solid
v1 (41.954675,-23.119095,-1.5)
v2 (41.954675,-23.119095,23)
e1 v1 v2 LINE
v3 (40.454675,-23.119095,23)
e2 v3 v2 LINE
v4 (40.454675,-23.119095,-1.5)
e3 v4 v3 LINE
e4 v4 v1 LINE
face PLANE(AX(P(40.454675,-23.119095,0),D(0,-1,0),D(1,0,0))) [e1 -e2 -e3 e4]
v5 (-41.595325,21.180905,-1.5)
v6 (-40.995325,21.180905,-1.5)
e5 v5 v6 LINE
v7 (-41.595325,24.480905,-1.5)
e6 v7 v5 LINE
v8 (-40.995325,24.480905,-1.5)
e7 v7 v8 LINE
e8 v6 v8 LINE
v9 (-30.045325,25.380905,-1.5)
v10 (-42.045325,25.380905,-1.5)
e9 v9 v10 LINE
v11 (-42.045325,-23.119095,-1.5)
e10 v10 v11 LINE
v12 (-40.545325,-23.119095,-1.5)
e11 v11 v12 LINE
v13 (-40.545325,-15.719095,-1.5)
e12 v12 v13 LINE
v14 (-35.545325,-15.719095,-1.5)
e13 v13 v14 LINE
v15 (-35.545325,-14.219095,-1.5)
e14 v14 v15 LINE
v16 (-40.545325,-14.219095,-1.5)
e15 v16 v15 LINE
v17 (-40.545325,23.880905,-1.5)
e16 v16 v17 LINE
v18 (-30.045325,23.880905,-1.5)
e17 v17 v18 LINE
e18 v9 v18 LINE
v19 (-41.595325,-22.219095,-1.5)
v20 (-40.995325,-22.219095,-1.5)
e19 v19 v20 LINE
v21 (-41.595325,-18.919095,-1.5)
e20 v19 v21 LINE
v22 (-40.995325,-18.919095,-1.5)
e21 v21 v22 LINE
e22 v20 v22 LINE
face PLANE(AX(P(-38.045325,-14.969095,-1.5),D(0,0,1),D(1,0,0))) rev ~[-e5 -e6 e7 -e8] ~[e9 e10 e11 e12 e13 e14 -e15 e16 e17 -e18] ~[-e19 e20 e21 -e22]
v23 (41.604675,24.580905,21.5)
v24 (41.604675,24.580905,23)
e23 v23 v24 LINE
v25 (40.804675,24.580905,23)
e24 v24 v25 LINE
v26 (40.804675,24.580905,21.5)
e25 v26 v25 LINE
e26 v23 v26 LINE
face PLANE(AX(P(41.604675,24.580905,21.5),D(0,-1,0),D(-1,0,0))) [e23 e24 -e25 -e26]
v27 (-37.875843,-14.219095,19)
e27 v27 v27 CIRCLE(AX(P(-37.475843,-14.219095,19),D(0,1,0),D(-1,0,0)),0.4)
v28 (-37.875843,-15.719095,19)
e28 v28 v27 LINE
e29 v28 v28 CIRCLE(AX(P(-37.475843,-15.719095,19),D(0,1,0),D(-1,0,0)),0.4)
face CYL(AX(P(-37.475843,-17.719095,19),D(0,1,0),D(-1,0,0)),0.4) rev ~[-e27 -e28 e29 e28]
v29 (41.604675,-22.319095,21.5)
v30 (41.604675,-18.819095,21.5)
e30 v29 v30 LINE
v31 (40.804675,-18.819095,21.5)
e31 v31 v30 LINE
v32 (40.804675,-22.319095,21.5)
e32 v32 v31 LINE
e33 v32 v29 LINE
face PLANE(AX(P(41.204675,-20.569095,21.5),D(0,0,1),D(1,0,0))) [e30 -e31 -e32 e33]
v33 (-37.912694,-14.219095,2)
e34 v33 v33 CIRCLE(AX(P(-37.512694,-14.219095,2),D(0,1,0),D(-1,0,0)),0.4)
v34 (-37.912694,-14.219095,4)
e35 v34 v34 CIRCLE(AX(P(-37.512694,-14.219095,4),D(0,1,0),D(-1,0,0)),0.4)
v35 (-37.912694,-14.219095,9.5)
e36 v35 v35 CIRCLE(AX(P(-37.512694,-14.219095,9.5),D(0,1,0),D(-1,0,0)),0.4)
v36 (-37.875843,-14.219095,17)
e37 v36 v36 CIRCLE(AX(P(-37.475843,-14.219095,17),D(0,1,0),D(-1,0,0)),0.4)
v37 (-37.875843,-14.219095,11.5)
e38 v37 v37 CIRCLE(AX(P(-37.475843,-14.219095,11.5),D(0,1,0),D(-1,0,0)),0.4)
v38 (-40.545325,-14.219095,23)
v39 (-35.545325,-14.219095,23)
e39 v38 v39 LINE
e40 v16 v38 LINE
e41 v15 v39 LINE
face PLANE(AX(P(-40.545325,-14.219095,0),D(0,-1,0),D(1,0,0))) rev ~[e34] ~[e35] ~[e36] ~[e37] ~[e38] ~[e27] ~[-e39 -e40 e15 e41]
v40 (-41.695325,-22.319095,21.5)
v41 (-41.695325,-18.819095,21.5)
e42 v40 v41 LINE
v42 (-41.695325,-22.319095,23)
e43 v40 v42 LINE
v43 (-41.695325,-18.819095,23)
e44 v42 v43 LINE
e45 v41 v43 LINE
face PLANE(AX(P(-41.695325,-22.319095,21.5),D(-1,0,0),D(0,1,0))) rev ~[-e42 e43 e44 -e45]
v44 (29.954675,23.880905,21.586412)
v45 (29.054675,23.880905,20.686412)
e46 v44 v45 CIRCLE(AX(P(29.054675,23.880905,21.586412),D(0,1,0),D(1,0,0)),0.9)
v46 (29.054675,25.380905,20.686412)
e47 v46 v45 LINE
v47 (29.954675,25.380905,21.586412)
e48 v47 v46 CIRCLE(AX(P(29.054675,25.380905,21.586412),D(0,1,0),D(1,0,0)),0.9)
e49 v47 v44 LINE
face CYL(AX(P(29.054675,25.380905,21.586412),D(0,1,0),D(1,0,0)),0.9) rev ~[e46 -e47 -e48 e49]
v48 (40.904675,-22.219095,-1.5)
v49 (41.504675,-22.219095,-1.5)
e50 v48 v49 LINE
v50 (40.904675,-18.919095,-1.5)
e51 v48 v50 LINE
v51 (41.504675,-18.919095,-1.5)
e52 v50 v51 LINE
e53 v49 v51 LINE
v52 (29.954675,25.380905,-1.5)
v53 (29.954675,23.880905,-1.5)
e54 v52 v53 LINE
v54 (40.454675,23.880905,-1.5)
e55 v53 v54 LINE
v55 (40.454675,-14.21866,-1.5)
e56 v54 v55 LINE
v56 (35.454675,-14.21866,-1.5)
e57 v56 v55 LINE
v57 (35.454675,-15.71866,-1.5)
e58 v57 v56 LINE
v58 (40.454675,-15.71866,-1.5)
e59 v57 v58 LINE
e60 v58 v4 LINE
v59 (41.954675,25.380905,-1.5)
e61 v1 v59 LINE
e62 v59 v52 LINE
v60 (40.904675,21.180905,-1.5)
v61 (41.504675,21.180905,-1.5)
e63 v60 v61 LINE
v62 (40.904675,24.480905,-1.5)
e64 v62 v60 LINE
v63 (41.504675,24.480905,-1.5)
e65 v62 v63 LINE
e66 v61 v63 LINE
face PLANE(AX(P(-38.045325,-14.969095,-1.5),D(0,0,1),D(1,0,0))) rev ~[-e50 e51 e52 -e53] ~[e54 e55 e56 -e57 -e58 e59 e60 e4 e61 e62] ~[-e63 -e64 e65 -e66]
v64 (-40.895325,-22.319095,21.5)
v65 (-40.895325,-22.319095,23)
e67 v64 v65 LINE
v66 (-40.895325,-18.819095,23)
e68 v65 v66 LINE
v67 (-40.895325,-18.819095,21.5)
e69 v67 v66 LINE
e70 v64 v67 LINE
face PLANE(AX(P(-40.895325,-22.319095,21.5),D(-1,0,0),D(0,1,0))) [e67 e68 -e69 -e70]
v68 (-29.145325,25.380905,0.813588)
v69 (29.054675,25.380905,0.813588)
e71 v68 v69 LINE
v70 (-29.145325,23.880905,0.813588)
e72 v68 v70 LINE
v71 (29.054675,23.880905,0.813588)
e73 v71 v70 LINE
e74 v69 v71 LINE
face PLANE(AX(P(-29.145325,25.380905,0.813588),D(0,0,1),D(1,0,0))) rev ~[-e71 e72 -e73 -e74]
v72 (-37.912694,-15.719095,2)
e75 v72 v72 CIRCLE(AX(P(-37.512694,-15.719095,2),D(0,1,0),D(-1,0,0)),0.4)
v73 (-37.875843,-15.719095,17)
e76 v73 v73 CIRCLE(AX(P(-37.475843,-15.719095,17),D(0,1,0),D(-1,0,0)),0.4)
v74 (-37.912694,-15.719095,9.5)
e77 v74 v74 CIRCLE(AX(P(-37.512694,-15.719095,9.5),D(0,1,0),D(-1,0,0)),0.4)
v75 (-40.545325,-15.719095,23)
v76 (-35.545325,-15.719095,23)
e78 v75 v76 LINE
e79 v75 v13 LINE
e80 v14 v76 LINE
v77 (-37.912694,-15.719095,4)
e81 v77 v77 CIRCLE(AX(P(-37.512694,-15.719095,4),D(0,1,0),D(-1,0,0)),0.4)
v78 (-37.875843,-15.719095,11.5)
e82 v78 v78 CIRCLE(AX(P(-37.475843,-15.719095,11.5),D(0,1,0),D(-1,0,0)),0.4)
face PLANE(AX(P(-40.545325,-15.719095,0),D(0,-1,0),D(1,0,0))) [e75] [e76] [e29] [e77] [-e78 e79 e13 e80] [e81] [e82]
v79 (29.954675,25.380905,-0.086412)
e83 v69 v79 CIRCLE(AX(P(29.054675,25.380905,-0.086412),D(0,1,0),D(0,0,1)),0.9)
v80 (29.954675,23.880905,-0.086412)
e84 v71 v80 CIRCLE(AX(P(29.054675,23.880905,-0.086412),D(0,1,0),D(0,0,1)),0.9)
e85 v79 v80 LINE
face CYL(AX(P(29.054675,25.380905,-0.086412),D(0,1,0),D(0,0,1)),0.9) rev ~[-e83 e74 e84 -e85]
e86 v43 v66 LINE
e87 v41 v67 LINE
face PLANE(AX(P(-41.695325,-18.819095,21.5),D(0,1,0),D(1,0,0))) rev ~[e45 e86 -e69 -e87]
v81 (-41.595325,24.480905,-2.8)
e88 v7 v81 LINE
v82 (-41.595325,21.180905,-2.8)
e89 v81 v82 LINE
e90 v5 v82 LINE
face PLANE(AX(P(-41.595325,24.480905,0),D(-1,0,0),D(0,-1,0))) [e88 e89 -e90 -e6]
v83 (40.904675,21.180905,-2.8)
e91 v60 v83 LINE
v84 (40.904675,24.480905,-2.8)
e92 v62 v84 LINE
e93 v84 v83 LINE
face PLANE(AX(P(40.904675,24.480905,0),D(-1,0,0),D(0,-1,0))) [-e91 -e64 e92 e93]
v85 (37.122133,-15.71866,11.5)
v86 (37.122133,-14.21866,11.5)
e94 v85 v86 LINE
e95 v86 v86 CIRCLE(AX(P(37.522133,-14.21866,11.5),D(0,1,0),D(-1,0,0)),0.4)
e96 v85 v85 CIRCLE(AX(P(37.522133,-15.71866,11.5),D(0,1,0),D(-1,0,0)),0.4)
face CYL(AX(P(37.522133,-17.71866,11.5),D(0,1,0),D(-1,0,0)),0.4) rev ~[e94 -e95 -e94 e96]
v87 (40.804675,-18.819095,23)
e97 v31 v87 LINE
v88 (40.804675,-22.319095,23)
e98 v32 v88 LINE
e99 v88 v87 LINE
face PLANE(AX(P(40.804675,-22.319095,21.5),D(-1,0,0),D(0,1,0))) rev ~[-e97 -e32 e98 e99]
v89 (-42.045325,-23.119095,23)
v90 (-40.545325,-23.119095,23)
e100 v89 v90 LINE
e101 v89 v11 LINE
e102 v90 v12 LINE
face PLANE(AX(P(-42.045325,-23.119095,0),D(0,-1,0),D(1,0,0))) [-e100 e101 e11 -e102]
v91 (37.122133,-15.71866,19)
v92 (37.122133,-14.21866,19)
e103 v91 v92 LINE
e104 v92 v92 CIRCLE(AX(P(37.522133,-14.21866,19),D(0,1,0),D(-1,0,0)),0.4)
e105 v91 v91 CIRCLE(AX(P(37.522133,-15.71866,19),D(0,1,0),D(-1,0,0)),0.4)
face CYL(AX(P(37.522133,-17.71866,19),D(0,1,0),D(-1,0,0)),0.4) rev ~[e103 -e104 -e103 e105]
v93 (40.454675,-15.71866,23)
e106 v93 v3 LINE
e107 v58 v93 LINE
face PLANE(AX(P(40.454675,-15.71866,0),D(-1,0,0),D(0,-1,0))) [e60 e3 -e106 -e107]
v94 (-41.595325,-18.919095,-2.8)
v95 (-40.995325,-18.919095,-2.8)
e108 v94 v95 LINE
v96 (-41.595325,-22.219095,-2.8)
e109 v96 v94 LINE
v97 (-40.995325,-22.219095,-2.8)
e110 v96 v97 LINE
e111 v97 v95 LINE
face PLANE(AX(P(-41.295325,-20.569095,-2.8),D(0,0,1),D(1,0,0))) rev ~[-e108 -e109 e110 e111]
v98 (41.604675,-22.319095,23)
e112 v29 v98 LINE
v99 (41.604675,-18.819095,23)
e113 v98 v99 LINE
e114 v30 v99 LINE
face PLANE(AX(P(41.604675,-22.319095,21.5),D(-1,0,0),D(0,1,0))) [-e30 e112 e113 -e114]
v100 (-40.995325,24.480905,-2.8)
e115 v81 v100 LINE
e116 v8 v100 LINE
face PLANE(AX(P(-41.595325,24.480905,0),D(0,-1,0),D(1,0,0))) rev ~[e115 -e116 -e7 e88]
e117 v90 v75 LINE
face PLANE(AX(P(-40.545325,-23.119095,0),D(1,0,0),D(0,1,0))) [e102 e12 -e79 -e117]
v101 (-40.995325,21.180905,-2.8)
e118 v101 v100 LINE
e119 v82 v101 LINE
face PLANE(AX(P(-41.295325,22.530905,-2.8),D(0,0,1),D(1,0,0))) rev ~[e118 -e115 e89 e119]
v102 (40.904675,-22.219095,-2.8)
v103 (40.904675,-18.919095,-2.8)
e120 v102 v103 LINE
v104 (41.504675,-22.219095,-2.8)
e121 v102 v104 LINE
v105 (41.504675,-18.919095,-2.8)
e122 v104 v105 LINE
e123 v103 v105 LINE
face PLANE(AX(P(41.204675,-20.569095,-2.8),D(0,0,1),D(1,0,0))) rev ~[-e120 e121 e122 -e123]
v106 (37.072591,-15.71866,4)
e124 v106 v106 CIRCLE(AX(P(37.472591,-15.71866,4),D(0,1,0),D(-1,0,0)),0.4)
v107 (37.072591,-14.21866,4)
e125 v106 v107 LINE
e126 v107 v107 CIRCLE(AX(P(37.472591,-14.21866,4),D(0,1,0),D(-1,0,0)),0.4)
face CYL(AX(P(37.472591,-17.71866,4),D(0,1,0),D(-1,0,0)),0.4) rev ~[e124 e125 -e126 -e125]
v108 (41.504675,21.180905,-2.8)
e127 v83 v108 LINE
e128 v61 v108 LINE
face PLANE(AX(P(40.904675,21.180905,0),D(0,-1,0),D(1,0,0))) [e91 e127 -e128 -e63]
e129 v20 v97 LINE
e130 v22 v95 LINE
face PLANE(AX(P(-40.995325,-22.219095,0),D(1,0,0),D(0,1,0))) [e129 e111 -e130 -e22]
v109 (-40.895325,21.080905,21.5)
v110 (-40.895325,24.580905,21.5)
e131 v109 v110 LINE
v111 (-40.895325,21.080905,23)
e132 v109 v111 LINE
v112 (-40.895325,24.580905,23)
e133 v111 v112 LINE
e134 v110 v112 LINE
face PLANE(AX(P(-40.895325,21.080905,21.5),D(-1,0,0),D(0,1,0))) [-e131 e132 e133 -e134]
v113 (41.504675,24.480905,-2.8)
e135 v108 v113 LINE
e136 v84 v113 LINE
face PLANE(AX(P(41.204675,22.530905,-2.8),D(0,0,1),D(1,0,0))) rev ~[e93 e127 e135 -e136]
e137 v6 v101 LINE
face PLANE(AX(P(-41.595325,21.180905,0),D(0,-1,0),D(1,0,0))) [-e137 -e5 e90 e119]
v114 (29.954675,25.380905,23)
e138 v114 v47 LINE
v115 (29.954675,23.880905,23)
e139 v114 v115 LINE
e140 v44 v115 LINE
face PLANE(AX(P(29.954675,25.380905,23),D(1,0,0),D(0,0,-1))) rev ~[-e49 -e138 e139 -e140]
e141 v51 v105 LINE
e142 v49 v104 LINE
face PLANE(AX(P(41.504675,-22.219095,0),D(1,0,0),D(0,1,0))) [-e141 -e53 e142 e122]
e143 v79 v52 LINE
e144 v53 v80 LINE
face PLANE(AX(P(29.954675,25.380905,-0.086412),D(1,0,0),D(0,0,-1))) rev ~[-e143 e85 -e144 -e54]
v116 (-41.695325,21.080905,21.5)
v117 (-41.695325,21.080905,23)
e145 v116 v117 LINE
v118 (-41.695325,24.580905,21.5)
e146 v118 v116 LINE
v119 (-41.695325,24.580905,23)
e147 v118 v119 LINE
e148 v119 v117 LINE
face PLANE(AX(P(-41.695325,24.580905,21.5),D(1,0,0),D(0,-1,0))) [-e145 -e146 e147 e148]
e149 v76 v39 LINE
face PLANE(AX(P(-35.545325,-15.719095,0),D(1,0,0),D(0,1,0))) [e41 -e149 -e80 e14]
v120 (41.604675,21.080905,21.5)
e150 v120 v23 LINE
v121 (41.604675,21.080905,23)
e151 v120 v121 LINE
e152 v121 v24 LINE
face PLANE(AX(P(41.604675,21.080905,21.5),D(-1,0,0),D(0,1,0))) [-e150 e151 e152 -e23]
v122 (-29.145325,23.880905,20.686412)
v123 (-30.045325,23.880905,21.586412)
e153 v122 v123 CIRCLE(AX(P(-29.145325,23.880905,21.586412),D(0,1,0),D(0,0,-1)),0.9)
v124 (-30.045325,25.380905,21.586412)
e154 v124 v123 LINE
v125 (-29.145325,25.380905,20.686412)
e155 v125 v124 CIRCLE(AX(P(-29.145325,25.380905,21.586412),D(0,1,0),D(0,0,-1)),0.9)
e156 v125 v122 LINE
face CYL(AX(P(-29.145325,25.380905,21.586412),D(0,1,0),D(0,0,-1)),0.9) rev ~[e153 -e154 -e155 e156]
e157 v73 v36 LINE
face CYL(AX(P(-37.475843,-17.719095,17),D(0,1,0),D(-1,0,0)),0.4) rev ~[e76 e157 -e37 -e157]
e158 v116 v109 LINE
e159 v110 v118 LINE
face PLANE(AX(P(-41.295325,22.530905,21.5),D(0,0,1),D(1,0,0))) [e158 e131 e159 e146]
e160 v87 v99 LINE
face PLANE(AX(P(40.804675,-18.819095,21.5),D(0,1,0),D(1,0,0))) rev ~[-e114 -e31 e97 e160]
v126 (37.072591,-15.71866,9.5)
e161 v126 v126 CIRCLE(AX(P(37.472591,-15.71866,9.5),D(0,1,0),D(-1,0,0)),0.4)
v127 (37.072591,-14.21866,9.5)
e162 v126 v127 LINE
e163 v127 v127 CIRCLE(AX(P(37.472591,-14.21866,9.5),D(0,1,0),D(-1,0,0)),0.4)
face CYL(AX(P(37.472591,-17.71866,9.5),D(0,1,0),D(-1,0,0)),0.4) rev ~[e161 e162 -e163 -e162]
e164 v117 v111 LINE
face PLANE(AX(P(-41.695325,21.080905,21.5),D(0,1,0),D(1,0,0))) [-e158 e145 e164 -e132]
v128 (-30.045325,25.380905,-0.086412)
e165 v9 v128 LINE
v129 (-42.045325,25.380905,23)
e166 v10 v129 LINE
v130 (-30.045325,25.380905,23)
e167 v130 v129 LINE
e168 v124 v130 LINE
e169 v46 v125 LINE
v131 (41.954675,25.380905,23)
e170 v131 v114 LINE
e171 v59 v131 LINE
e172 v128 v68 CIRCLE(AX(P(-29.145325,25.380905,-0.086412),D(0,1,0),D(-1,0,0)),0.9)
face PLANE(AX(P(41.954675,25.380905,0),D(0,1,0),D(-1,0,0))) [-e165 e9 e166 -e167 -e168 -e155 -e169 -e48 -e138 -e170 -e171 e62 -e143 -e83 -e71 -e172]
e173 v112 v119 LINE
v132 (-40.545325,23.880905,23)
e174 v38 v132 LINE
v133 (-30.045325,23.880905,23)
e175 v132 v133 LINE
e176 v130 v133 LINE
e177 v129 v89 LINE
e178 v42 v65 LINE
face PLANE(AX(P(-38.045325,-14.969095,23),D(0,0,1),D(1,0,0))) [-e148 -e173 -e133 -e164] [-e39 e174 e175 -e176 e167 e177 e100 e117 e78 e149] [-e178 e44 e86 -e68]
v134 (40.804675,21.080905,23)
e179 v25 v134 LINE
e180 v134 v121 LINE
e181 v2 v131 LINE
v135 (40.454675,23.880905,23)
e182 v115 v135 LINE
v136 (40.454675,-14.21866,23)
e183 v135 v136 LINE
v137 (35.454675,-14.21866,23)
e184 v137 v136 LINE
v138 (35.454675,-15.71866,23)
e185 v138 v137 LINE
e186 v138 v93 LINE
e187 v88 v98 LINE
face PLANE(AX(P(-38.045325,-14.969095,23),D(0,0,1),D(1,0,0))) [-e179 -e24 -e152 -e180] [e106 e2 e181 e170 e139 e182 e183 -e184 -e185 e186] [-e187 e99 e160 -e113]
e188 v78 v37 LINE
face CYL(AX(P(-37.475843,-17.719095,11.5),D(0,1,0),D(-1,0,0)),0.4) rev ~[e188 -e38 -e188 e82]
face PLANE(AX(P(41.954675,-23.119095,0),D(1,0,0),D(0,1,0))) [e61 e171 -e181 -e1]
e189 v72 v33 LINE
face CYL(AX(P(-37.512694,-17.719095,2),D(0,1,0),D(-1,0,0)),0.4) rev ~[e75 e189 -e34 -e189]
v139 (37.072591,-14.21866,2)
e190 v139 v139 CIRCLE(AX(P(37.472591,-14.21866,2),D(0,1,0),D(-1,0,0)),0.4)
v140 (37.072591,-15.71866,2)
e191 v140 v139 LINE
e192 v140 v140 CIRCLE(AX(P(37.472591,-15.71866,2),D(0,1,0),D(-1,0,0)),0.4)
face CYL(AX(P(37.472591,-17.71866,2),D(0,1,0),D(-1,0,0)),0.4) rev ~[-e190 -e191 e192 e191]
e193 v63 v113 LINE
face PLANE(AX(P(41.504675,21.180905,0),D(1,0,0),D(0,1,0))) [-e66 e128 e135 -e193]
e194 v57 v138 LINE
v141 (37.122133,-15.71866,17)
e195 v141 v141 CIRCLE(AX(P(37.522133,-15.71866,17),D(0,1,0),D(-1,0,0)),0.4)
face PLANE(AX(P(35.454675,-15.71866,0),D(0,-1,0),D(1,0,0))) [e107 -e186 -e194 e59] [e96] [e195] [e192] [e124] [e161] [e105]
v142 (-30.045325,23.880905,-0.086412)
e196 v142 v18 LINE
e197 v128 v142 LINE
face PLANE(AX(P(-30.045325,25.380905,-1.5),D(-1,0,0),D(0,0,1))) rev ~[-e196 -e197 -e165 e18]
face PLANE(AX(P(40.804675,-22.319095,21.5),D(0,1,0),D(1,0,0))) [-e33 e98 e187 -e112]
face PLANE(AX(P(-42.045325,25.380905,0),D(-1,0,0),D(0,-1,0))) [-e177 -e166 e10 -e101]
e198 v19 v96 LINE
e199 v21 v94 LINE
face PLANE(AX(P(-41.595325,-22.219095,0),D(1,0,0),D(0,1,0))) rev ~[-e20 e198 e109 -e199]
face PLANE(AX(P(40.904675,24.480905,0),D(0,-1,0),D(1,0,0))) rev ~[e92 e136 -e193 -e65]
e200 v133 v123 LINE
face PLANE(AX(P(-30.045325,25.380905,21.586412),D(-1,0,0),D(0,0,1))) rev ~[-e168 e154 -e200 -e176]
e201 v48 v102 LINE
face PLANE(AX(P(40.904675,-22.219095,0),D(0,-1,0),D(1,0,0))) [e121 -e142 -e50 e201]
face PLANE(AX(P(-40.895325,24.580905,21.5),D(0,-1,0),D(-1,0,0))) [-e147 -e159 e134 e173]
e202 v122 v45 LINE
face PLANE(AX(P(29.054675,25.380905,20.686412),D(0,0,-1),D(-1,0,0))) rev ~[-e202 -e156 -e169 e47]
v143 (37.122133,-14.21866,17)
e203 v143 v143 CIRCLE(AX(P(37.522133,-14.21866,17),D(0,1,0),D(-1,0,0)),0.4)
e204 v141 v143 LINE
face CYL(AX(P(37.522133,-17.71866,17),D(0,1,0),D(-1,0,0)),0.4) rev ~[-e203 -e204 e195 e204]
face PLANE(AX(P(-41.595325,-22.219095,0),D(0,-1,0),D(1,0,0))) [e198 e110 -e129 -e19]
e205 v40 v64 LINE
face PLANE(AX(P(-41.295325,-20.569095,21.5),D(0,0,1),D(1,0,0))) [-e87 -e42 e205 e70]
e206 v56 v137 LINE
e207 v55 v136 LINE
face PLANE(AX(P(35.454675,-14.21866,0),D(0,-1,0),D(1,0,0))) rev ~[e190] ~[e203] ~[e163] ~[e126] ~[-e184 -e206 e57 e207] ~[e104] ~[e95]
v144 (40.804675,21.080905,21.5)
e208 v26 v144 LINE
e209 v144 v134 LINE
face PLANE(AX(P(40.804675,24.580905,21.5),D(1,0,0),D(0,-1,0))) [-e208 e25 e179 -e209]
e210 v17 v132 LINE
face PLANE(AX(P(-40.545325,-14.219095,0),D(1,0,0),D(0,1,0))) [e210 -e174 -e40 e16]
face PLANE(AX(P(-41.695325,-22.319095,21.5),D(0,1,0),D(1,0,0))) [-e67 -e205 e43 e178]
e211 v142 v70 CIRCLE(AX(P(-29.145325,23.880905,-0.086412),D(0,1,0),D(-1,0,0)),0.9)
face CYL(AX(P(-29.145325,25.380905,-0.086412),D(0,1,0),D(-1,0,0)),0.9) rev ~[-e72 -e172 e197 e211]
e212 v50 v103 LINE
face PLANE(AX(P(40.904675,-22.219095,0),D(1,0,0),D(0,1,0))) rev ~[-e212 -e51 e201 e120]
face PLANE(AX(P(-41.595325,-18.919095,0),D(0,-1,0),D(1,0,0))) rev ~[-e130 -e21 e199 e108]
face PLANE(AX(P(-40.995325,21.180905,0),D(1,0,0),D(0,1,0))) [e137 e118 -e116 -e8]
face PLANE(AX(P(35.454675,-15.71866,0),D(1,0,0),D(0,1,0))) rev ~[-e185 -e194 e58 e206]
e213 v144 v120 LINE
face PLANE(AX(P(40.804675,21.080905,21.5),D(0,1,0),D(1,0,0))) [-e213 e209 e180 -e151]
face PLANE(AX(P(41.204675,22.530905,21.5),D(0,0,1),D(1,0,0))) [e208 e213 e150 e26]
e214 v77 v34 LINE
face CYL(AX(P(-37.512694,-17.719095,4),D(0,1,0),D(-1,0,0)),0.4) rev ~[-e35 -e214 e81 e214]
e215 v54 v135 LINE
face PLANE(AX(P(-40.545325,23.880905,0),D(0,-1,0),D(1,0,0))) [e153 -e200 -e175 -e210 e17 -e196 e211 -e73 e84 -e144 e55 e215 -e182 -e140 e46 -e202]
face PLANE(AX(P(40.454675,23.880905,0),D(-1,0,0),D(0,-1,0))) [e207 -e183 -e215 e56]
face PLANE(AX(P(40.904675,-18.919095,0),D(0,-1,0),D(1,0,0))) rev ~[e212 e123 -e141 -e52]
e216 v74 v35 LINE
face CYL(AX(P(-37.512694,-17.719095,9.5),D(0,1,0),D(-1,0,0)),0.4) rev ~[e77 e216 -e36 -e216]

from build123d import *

# Parameters (mm, degrees)
F0_W          = 5
F0_H          = 1.5
F0_W_2        = 0.8
F0_H_2        = 3.5
F0_W_3        = 0.6
F0_H_3        = 3.3
F0_H_4        = 2.7
F0_H_5        = 0.6
F1_DEPTH      = 23
F1_DEPTH_BACK = 1.5
F3_D          = 0.8
F3_DEPTH      = 2
F3_TIP        = 0.2403442476
F5_D          = 0.8
F5_DEPTH      = 2
F5_TIP        = 0.2403442476
F6_DEPTH      = 2.8
F7_START      = 21.5
F7_DEPTH      = 1.5
F9_DEPTH      = 2


# Not quite as in the source:
# - a feature names something its author has since deleted; it is built from what else it names


with BuildPart() as f1:
    # F0 (on Top) → F1 (new body, two sides)
    with BuildSketch(Plane.XY) as f1_sk:
        with Locations((-38.0453250408, -14.9690947816)):
            Rectangle(F0_W, F0_H)
        Polygon((-42.0453250408, -23.1190947816), (-40.5453250408, -23.1190947816), (-40.5453250408, -15.7190947816), (-40.5453250408, -14.2190947816), (-40.5453250408, 23.8809052184), (-40.8953250408, 23.8809052184), (-40.8953250408, 21.0809052184), (-41.6953250408, 21.0809052184), (-41.6953250408, 23.8809052184), (-42.0453250408, 23.8809052184), align=None)
        with Locations((-41.2953250408, -20.5690947816)):
            Rectangle(F0_W_2, F0_H_2, mode=Mode.SUBTRACT)
        Polygon((-42.0453250408, 25.3809052184), (-42.0453250408, 23.8809052184), (-41.6953250408, 23.8809052184), (-41.6953250408, 24.5809052184), (-40.8953250408, 24.5809052184), (-40.8953250408, 23.8809052184), (-40.5453250408, 23.8809052184), (40.4546749592, 23.8809052184), (40.8046749592, 23.8809052184), (40.8046749592, 24.5809052184), (41.6046749592, 24.5809052184), (41.6046749592, 23.8809052184), (41.9546749592, 23.8809052184), (41.9546749592, 25.3809052184), align=None)
        Polygon((40.8046749592, 23.8809052184), (40.4546749592, 23.8809052184), (40.4546749592, -14.2186603174), (40.4546749592, -15.7186603174), (40.4546749592, -23.1190947816), (41.9546749592, -23.1190947816), (41.9546749592, 23.8809052184), (41.6046749592, 23.8809052184), (41.6046749592, 21.0809052184), (40.8046749592, 21.0809052184), align=None)
        with Locations((41.2046749592, -20.5690947816)):
            Rectangle(F0_W_2, F0_H_2, mode=Mode.SUBTRACT)
        with Locations((37.9546749592, -14.9686603174)):
            Rectangle(F0_W, F0_H)
        with Locations((-41.2953250408, -20.5690947816)):
            Rectangle(F0_W_2, F0_H_2)
        with Locations((-41.2953250408, -20.5690947816)):
            Rectangle(F0_W_3, F0_H_3, mode=Mode.SUBTRACT)
        with Locations((41.2046749592, -20.5690947816)):
            Rectangle(F0_W_2, F0_H_2)
        with Locations((41.2046749592, -20.5690947816)):
            Rectangle(F0_W_3, F0_H_3, mode=Mode.SUBTRACT)
        Polygon((40.9046749592, 23.8809052184), (40.8046749592, 23.8809052184), (40.8046749592, 21.0809052184), (41.6046749592, 21.0809052184), (41.6046749592, 23.8809052184), (41.5046749592, 23.8809052184), (41.5046749592, 21.1809052184), (40.9046749592, 21.1809052184), align=None)
        Polygon((40.8046749592, 24.5809052184), (40.8046749592, 23.8809052184), (40.9046749592, 23.8809052184), (40.9046749592, 24.4809052184), (41.5046749592, 24.4809052184), (41.5046749592, 23.8809052184), (41.6046749592, 23.8809052184), (41.6046749592, 24.5809052184), align=None)
        Polygon((-41.6953250408, 24.5809052184), (-41.6953250408, 23.8809052184), (-41.5953250408, 23.8809052184), (-41.5953250408, 24.4809052184), (-40.9953250408, 24.4809052184), (-40.9953250408, 23.8809052184), (-40.8953250408, 23.8809052184), (-40.8953250408, 24.5809052184), align=None)
        Polygon((-41.5953250408, 23.8809052184), (-41.6953250408, 23.8809052184), (-41.6953250408, 21.0809052184), (-40.8953250408, 21.0809052184), (-40.8953250408, 23.8809052184), (-40.9953250408, 23.8809052184), (-40.9953250408, 21.1809052184), (-41.5953250408, 21.1809052184), align=None)
        with Locations((-41.2953250408, -20.5690947816)):
            Rectangle(F0_W_3, F0_H_3)
        with Locations((-41.2953250408, 22.5309052184)):
            Rectangle(F0_W_3, F0_H_4)
        with Locations((41.2046749592, -20.5690947816)):
            Rectangle(F0_W_3, F0_H_3)
        with Locations((41.2046749592, 22.5309052184)):
            Rectangle(F0_W_3, F0_H_4)
        with Locations((41.2046749592, 24.1809052184)):
            Rectangle(F0_W_3, F0_H_5)
        with Locations((-41.2953250408, 24.1809052184)):
            Rectangle(F0_W_3, F0_H_5)
    extrude(amount=F1_DEPTH)
    extrude(f1_sk.sketch, amount=-F1_DEPTH_BACK)

    # F3
    with Locations(Plane.XZ.offset(15.7190947816)):
        with Locations((-37.4758429825, 18.9999998622), (-37.4758429825, 16.9999998622), (-37.4758429825, 11.4999998622), (-37.5126936273, 9.5), (-37.5126936273, 3.9999998622), (-37.5126936273, 2)):
            Hole(F3_D / 2, depth=F3_DEPTH)
            with Locations((0, 0, -(F3_DEPTH + F3_TIP / 2))):  # 118° drill point
                Cone(0, F3_D / 2, F3_TIP, mode=Mode.SUBTRACT)

    # F5
    with Locations(Plane.XZ.offset(15.7186603174)):
        with Locations((37.5221328411, 19.00000019), (37.5221328411, 17.00000019), (37.5221328411, 11.50000019), (37.4725908041, 9.5000003278), (37.4725908041, 4.00000019), (37.4725908041, 2.0000003278)):
            Hole(F5_D / 2, depth=F5_DEPTH)
            with Locations((0, 0, -(F5_DEPTH + F5_TIP / 2))):  # 118° drill point
                Cone(0, F5_D / 2, F5_TIP, mode=Mode.SUBTRACT)

    # F0 (on Top) → F6 (join)
    with BuildSketch(Plane.XY):
        with Locations((-41.2953250408, 22.5309052184)):
            Rectangle(F0_W_3, F0_H_4)
        with Locations((-41.2953250408, 24.1809052184)):
            Rectangle(F0_W_3, F0_H_5)
        with Locations((-41.2953250408, -20.5690947816)):
            Rectangle(F0_W_3, F0_H_3)
        with Locations((41.2046749592, 22.5309052184)):
            Rectangle(F0_W_3, F0_H_4)
        with Locations((41.2046749592, 24.1809052184)):
            Rectangle(F0_W_3, F0_H_5)
        with Locations((41.2046749592, -20.5690947816)):
            Rectangle(F0_W_3, F0_H_3)
    extrude(amount=-F6_DEPTH)

    # F0 (on Top) → F7 (cut)
    with BuildSketch(Plane.XY.offset(F7_START)):
        with Locations((-41.2953250408, -20.5690947816)):
            Rectangle(F0_W_2, F0_H_2)
        with Locations((-41.2953250408, -20.5690947816)):
            Rectangle(F0_W_3, F0_H_3, mode=Mode.SUBTRACT)
        with Locations((41.2046749592, -20.5690947816)):
            Rectangle(F0_W_2, F0_H_2)
        with Locations((41.2046749592, -20.5690947816)):
            Rectangle(F0_W_3, F0_H_3, mode=Mode.SUBTRACT)
        with Locations((-41.2953250408, -20.5690947816)):
            Rectangle(F0_W_3, F0_H_3)
        with Locations((41.2046749592, -20.5690947816)):
            Rectangle(F0_W_3, F0_H_3)
        with Locations((-41.2953250408, 22.5309052184)):
            Rectangle(F0_W_3, F0_H_4)
        with Locations((41.2046749592, 22.5309052184)):
            Rectangle(F0_W_3, F0_H_4)
        Polygon((-41.5953250408, 23.8809052184), (-41.6953250408, 23.8809052184), (-41.6953250408, 21.0809052184), (-40.8953250408, 21.0809052184), (-40.8953250408, 23.8809052184), (-40.9953250408, 23.8809052184), (-40.9953250408, 21.1809052184), (-41.5953250408, 21.1809052184), align=None)
        Polygon((40.9046749592, 23.8809052184), (40.8046749592, 23.8809052184), (40.8046749592, 21.0809052184), (41.6046749592, 21.0809052184), (41.6046749592, 23.8809052184), (41.5046749592, 23.8809052184), (41.5046749592, 21.1809052184), (40.9046749592, 21.1809052184), align=None)
        with Locations((-41.2953250408, 24.1809052184)):
            Rectangle(F0_W_3, F0_H_5)
        with Locations((41.2046749592, 24.1809052184)):
            Rectangle(F0_W_3, F0_H_5)
        Polygon((40.8046749592, 24.5809052184), (40.8046749592, 23.8809052184), (40.9046749592, 23.8809052184), (40.9046749592, 24.4809052184), (41.5046749592, 24.4809052184), (41.5046749592, 23.8809052184), (41.6046749592, 23.8809052184), (41.6046749592, 24.5809052184), align=None)
        Polygon((-41.6953250408, 24.5809052184), (-41.6953250408, 23.8809052184), (-41.5953250408, 23.8809052184), (-41.5953250408, 24.4809052184), (-40.9953250408, 24.4809052184), (-40.9953250408, 23.8809052184), (-40.8953250408, 23.8809052184), (-40.8953250408, 24.5809052184), align=None)
    extrude(amount=F7_DEPTH, mode=Mode.SUBTRACT)

    # F8 (on face) → F9 (cut)
    with BuildSketch(Plane(origin=(0, 25.3809052184, 0), x_dir=(-1, 0, 0), z_dir=(0, 1, 0))):
        with BuildLine():
            ThreePointArc((-29.9546749592, 21.5864117908), (-29.6910710623, 20.9500156878), (-29.0546749592, 20.6864117908))
            Line((-29.0546749592, 20.6864117908), (29.1453250408, 20.6864117908))
            ThreePointArc((29.1453250408, 20.6864117908), (29.7817211439, 20.9500156878), (30.0453250408, 21.5864117908))
            Line((30.0453250408, 21.5864117908), (30.0453250408, 23))
            Line((30.0453250408, 23), (-29.9546749592, 23))
            Line((-29.9546749592, 23), (-29.9546749592, 21.5864117908))
        make_face()
        with BuildLine():
            Line((-29.9546749592, -0.0864118039), (-29.9546749592, -1.500000013))
            Line((-29.9546749592, -1.500000013), (30.0453250408, -1.500000013))
            Line((30.0453250408, -1.500000013), (30.0453250408, -0.0864118039))
            ThreePointArc((30.0453250408, -0.0864118039), (29.7817211439, 0.5499842992), (29.1453250408, 0.8135881961))
            Line((29.1453250408, 0.8135881961), (-29.0546749592, 0.8135881961))
            ThreePointArc((-29.0546749592, 0.8135881961), (-29.6910710623, 0.5499842992), (-29.9546749592, -0.0864118039))
        make_face()
    extrude(amount=-F9_DEPTH, mode=Mode.SUBTRACT)


solid = f1.part
